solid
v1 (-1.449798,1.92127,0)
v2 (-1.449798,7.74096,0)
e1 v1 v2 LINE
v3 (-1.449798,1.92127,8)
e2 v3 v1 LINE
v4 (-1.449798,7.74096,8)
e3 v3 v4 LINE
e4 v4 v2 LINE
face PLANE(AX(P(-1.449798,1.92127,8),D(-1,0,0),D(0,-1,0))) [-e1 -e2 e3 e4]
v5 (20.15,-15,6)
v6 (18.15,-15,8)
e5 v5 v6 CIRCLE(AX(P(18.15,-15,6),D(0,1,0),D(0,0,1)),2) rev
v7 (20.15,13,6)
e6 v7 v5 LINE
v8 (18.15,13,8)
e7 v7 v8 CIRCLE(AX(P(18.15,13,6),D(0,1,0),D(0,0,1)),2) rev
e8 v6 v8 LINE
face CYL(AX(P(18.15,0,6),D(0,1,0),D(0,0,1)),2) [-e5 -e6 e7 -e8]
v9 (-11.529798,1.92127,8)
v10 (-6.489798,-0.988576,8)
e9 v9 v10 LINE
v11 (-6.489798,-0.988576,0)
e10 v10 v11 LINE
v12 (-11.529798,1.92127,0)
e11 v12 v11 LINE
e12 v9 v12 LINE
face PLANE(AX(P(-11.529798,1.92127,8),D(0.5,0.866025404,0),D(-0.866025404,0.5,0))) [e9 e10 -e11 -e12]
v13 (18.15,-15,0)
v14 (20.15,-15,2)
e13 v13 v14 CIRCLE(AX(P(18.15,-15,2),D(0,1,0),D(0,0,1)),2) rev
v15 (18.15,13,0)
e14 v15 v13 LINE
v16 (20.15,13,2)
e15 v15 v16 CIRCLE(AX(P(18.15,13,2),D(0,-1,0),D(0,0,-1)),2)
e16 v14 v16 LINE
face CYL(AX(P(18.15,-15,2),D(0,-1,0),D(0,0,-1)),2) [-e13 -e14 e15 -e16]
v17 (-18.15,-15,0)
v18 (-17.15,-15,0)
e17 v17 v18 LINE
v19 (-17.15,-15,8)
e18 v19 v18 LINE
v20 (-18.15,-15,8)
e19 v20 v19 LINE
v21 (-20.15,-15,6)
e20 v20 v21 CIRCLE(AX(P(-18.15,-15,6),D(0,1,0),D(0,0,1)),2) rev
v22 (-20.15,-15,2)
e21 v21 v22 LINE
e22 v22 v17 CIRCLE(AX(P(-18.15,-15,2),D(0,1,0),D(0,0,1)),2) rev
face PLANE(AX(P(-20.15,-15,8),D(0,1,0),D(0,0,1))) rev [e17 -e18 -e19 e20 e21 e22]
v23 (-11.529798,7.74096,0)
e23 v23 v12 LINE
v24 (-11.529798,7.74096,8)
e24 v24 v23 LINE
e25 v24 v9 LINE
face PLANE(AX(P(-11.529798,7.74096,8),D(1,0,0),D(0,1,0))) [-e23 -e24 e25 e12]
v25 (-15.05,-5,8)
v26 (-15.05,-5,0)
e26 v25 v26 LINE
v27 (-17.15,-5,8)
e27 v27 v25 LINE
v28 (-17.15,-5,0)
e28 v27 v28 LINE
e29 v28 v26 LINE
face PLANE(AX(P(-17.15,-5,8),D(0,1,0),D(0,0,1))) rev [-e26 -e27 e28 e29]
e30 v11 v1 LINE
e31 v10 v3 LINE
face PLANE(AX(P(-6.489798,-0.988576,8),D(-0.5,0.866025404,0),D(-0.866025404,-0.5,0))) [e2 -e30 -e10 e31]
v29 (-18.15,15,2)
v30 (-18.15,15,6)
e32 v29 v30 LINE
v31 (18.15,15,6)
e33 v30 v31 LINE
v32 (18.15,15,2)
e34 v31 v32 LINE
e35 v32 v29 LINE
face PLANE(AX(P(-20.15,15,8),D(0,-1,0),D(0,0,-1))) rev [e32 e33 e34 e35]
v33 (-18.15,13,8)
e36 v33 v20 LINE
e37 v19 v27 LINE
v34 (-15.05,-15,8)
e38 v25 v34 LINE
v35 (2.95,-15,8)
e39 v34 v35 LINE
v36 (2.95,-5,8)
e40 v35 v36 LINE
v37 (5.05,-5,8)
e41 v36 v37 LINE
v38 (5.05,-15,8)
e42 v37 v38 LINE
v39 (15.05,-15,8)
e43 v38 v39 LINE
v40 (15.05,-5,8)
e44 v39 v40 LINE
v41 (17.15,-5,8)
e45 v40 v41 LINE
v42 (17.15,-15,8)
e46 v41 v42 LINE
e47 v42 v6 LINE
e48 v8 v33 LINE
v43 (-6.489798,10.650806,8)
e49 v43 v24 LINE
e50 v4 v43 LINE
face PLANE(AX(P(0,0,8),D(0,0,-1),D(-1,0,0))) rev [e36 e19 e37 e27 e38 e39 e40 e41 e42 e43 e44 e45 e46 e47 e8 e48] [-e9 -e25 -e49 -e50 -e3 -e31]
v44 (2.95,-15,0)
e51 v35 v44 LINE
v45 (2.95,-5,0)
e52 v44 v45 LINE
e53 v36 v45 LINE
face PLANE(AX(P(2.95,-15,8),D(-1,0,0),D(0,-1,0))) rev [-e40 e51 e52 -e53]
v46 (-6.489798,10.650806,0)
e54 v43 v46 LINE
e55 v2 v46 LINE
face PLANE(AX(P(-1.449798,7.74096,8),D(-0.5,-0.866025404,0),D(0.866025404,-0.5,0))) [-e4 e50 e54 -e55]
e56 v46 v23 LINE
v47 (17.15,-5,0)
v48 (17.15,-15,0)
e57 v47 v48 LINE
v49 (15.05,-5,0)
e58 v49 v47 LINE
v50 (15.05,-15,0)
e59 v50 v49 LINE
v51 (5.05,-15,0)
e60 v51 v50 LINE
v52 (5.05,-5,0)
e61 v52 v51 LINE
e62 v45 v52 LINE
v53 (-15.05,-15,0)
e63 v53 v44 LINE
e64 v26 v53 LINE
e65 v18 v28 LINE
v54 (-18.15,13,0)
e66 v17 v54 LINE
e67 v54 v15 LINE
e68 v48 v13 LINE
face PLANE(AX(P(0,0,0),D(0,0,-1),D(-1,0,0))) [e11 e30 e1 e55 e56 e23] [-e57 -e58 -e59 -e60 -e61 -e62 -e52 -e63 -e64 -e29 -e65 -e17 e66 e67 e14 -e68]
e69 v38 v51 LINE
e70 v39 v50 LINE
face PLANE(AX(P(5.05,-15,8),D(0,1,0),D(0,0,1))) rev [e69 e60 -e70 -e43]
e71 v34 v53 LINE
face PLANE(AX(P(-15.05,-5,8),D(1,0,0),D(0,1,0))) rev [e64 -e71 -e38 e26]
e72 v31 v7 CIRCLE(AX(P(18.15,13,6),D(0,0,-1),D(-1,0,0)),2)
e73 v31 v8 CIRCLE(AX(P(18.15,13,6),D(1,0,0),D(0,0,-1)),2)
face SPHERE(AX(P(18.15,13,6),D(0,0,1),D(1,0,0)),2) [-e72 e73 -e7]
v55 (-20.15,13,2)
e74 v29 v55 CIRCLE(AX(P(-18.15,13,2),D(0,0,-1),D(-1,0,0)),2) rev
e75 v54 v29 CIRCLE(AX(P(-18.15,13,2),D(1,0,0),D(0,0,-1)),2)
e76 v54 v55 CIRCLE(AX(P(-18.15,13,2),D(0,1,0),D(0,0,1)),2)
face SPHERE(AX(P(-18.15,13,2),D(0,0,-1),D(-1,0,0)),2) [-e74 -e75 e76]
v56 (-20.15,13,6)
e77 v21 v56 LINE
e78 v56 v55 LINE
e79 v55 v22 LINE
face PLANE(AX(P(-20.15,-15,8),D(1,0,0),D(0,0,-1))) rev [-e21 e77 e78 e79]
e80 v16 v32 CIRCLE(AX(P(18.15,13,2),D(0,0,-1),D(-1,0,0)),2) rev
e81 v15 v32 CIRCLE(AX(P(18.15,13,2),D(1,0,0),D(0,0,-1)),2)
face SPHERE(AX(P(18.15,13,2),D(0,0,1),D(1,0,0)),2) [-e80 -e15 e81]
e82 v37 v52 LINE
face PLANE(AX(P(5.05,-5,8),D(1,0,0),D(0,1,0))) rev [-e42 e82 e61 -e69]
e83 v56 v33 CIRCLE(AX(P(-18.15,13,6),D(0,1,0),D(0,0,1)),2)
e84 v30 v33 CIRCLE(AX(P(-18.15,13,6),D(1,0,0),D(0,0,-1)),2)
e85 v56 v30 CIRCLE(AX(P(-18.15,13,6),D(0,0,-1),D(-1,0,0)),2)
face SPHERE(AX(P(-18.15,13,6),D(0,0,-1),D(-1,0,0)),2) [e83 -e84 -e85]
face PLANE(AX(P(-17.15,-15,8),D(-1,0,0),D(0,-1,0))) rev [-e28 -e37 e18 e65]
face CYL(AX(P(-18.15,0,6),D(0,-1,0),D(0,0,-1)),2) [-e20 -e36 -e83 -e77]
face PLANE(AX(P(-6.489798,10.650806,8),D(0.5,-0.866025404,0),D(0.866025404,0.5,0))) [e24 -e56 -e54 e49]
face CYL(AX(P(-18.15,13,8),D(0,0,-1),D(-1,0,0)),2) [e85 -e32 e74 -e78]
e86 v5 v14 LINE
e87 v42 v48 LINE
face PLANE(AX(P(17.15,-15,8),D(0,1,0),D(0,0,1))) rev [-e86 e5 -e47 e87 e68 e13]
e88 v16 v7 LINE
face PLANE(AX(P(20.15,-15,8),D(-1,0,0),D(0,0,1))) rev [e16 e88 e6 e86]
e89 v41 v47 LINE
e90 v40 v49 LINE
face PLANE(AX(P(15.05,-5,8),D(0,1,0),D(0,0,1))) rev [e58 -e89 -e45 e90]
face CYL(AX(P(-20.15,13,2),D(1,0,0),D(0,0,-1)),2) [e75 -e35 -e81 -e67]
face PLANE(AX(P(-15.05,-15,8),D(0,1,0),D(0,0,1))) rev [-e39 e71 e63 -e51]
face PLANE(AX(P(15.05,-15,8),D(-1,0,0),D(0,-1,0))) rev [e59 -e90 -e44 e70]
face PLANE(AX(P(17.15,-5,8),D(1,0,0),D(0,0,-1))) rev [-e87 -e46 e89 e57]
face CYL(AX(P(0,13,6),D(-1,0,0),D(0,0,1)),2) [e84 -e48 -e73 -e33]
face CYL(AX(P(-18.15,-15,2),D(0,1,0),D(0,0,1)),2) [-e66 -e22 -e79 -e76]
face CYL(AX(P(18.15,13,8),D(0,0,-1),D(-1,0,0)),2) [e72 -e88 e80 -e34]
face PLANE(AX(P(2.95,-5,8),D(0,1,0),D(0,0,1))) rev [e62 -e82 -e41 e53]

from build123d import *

# Parameters (mm, degrees)
BOSS_EXTRUDE1_DEPTH = 8
FILLET6_R           = 2
FILLET7_R           = 2
FILLET8_R           = 2


with BuildPart() as part:
    # Sketch1 → Boss-Extrude1 (new body)
    with BuildSketch(Plane.XY):
        Polygon((-17.15, -15), (-17.15, -5), (-15.05, -5), (-15.05, -15), (2.95, -15), (2.95, -5), (5.05, -5), (5.05, -15), (15.05, -15), (15.05, -5), (17.15, -5), (17.15, -15), (20.15, -15), (20.15, 15), (-20.15, 15), (-20.15, -15), align=None)
        Polygon((-1.4497978, 7.740960344), (-6.4897978, 10.650805701), (-11.5297978, 7.740960344), (-11.5297978, 1.921269631), (-6.4897978, -0.988575726), (-1.4497978, 1.921269631), align=None, mode=Mode.SUBTRACT)
    extrude(amount=BOSS_EXTRUDE1_DEPTH)

    # Fillet6
    fillet6_edges = [part.edges().sort_by_distance(p)[0] for p in [
        (-20.15, 15, 4),
    ]]
    fillet(fillet6_edges, radius=FILLET6_R)

    # Fillet7
    fillet7_edges = [part.edges().sort_by_distance(p)[0] for p in [
        (20.15, 0, 0),
        (20.15, 15, 4),
        (20.15, 0, 8),
    ]]
    fillet(fillet7_edges, radius=FILLET7_R)

    # Fillet8
    # the kernel refuses this fillet: 2 mm, written as the material it takes off along each edge
    with BuildSketch(Plane(origin=(18.15, 13, 2), x_dir=(0, 0, -1), z_dir=(0, 1, 0))) as fillet8_piece_1_section:
        Polygon((0, 0), (FILLET8_R, 0), (FILLET8_R, -FILLET8_R), (0, -FILLET8_R), align=None)
    fillet8_piece_1 = extrude(amount=FILLET8_R, mode=Mode.PRIVATE)
    fillet8_piece_1 = fillet8_piece_1 - Plane(origin=(18.15, 13, 2), x_dir=(-0.7071067811865475, 0, 0.7071067811865475), z_dir=(0, 1, 0)) * Sphere(FILLET8_R, mode=Mode.PRIVATE)
    add(fillet8_piece_1, mode=Mode.SUBTRACT)
    with BuildSketch(Plane(origin=(18.15, 13, 6), x_dir=(0, 0, 1), z_dir=(0, 1, 0))) as fillet8_piece_2_section:
        Polygon((0, 0), (FILLET8_R, 0), (FILLET8_R, FILLET8_R), (0, FILLET8_R), align=None)
    fillet8_piece_2 = extrude(amount=FILLET8_R, mode=Mode.PRIVATE)
    fillet8_piece_2 = fillet8_piece_2 - Plane(origin=(18.15, 13, 6), x_dir=(-0.7071067811865475, 0, -0.7071067811865475), z_dir=(0, 1, 0)) * Sphere(FILLET8_R, mode=Mode.PRIVATE)
    add(fillet8_piece_2, mode=Mode.SUBTRACT)
    with BuildSketch(Plane(origin=(-20.15, 13, 0), x_dir=(1, 0, 0), z_dir=(0, -1, 0))) as fillet8_piece_3:
        with BuildLine():
            CenterArc((FILLET8_R, FILLET8_R), FILLET8_R, 180, 90)
            Line((0, FILLET8_R), (0, 0))
            Line((0, 0), (FILLET8_R, 0))
        make_face()
    extrude(amount=33, mode=Mode.SUBTRACT)
    with BuildSketch(Plane(origin=(-20.15, 13, 8), x_dir=(1, 0, 0), z_dir=(0, -1, 0))) as fillet8_piece_4:
        with BuildLine():
            CenterArc((FILLET8_R, -FILLET8_R), FILLET8_R, 90, 90)
            Line((0, -FILLET8_R), (0, 0))
            Line((0, 0), (FILLET8_R, 0))
        make_face()
    extrude(amount=33, mode=Mode.SUBTRACT)
    with BuildSketch(Plane(origin=(-18.15, 13, 0), x_dir=(0, 1, 0), z_dir=(1, 0, 0))) as fillet8_piece_5:
        with BuildLine():
            CenterArc((2 - FILLET8_R, FILLET8_R), FILLET8_R, 270, 90)
            Line((2, FILLET8_R), (2, 0))
            Line((2, 0), (2 - FILLET8_R, 0))
        make_face()
    revolve(axis=Axis((-18.15, 13, 0), (0, 0, 1)), revolution_arc=90, mode=Mode.SUBTRACT)
    with BuildSketch(Plane(origin=(-18.15, 13, 8), x_dir=(0, 1, 0), z_dir=(1, 0, 0))) as fillet8_piece_6:
        with BuildLine():
            CenterArc((2 - FILLET8_R, -FILLET8_R), FILLET8_R, 0, 90)
            Line((2 - FILLET8_R, 0), (2, 0))
            Line((2, 0), (2, -FILLET8_R))
        make_face()
    revolve(axis=Axis((-18.15, 13, 8), (0, 0, 1)), revolution_arc=90, mode=Mode.SUBTRACT)
    with BuildSketch(Plane(origin=(18.15, 15, 8), x_dir=(0, 0, -1), z_dir=(-1, 0, 0))) as fillet8_piece_7:
        with BuildLine():
            CenterArc((FILLET8_R, FILLET8_R), FILLET8_R, 180, 90)
            Line((0, FILLET8_R), (0, 0))
            Line((0, 0), (FILLET8_R, 0))
        make_face()
    extrude(amount=36.3, mode=Mode.SUBTRACT)
    with BuildSketch(Plane(origin=(18.15, 15, 0), x_dir=(0, 0, 1), z_dir=(-1, 0, 0))) as fillet8_piece_8:
        with BuildLine():
            CenterArc((FILLET8_R, -FILLET8_R), FILLET8_R, 90, 90)
            Line((0, -FILLET8_R), (0, 0))
            Line((0, 0), (FILLET8_R, 0))
        make_face()
    extrude(amount=36.3, mode=Mode.SUBTRACT)


solid = part.part
